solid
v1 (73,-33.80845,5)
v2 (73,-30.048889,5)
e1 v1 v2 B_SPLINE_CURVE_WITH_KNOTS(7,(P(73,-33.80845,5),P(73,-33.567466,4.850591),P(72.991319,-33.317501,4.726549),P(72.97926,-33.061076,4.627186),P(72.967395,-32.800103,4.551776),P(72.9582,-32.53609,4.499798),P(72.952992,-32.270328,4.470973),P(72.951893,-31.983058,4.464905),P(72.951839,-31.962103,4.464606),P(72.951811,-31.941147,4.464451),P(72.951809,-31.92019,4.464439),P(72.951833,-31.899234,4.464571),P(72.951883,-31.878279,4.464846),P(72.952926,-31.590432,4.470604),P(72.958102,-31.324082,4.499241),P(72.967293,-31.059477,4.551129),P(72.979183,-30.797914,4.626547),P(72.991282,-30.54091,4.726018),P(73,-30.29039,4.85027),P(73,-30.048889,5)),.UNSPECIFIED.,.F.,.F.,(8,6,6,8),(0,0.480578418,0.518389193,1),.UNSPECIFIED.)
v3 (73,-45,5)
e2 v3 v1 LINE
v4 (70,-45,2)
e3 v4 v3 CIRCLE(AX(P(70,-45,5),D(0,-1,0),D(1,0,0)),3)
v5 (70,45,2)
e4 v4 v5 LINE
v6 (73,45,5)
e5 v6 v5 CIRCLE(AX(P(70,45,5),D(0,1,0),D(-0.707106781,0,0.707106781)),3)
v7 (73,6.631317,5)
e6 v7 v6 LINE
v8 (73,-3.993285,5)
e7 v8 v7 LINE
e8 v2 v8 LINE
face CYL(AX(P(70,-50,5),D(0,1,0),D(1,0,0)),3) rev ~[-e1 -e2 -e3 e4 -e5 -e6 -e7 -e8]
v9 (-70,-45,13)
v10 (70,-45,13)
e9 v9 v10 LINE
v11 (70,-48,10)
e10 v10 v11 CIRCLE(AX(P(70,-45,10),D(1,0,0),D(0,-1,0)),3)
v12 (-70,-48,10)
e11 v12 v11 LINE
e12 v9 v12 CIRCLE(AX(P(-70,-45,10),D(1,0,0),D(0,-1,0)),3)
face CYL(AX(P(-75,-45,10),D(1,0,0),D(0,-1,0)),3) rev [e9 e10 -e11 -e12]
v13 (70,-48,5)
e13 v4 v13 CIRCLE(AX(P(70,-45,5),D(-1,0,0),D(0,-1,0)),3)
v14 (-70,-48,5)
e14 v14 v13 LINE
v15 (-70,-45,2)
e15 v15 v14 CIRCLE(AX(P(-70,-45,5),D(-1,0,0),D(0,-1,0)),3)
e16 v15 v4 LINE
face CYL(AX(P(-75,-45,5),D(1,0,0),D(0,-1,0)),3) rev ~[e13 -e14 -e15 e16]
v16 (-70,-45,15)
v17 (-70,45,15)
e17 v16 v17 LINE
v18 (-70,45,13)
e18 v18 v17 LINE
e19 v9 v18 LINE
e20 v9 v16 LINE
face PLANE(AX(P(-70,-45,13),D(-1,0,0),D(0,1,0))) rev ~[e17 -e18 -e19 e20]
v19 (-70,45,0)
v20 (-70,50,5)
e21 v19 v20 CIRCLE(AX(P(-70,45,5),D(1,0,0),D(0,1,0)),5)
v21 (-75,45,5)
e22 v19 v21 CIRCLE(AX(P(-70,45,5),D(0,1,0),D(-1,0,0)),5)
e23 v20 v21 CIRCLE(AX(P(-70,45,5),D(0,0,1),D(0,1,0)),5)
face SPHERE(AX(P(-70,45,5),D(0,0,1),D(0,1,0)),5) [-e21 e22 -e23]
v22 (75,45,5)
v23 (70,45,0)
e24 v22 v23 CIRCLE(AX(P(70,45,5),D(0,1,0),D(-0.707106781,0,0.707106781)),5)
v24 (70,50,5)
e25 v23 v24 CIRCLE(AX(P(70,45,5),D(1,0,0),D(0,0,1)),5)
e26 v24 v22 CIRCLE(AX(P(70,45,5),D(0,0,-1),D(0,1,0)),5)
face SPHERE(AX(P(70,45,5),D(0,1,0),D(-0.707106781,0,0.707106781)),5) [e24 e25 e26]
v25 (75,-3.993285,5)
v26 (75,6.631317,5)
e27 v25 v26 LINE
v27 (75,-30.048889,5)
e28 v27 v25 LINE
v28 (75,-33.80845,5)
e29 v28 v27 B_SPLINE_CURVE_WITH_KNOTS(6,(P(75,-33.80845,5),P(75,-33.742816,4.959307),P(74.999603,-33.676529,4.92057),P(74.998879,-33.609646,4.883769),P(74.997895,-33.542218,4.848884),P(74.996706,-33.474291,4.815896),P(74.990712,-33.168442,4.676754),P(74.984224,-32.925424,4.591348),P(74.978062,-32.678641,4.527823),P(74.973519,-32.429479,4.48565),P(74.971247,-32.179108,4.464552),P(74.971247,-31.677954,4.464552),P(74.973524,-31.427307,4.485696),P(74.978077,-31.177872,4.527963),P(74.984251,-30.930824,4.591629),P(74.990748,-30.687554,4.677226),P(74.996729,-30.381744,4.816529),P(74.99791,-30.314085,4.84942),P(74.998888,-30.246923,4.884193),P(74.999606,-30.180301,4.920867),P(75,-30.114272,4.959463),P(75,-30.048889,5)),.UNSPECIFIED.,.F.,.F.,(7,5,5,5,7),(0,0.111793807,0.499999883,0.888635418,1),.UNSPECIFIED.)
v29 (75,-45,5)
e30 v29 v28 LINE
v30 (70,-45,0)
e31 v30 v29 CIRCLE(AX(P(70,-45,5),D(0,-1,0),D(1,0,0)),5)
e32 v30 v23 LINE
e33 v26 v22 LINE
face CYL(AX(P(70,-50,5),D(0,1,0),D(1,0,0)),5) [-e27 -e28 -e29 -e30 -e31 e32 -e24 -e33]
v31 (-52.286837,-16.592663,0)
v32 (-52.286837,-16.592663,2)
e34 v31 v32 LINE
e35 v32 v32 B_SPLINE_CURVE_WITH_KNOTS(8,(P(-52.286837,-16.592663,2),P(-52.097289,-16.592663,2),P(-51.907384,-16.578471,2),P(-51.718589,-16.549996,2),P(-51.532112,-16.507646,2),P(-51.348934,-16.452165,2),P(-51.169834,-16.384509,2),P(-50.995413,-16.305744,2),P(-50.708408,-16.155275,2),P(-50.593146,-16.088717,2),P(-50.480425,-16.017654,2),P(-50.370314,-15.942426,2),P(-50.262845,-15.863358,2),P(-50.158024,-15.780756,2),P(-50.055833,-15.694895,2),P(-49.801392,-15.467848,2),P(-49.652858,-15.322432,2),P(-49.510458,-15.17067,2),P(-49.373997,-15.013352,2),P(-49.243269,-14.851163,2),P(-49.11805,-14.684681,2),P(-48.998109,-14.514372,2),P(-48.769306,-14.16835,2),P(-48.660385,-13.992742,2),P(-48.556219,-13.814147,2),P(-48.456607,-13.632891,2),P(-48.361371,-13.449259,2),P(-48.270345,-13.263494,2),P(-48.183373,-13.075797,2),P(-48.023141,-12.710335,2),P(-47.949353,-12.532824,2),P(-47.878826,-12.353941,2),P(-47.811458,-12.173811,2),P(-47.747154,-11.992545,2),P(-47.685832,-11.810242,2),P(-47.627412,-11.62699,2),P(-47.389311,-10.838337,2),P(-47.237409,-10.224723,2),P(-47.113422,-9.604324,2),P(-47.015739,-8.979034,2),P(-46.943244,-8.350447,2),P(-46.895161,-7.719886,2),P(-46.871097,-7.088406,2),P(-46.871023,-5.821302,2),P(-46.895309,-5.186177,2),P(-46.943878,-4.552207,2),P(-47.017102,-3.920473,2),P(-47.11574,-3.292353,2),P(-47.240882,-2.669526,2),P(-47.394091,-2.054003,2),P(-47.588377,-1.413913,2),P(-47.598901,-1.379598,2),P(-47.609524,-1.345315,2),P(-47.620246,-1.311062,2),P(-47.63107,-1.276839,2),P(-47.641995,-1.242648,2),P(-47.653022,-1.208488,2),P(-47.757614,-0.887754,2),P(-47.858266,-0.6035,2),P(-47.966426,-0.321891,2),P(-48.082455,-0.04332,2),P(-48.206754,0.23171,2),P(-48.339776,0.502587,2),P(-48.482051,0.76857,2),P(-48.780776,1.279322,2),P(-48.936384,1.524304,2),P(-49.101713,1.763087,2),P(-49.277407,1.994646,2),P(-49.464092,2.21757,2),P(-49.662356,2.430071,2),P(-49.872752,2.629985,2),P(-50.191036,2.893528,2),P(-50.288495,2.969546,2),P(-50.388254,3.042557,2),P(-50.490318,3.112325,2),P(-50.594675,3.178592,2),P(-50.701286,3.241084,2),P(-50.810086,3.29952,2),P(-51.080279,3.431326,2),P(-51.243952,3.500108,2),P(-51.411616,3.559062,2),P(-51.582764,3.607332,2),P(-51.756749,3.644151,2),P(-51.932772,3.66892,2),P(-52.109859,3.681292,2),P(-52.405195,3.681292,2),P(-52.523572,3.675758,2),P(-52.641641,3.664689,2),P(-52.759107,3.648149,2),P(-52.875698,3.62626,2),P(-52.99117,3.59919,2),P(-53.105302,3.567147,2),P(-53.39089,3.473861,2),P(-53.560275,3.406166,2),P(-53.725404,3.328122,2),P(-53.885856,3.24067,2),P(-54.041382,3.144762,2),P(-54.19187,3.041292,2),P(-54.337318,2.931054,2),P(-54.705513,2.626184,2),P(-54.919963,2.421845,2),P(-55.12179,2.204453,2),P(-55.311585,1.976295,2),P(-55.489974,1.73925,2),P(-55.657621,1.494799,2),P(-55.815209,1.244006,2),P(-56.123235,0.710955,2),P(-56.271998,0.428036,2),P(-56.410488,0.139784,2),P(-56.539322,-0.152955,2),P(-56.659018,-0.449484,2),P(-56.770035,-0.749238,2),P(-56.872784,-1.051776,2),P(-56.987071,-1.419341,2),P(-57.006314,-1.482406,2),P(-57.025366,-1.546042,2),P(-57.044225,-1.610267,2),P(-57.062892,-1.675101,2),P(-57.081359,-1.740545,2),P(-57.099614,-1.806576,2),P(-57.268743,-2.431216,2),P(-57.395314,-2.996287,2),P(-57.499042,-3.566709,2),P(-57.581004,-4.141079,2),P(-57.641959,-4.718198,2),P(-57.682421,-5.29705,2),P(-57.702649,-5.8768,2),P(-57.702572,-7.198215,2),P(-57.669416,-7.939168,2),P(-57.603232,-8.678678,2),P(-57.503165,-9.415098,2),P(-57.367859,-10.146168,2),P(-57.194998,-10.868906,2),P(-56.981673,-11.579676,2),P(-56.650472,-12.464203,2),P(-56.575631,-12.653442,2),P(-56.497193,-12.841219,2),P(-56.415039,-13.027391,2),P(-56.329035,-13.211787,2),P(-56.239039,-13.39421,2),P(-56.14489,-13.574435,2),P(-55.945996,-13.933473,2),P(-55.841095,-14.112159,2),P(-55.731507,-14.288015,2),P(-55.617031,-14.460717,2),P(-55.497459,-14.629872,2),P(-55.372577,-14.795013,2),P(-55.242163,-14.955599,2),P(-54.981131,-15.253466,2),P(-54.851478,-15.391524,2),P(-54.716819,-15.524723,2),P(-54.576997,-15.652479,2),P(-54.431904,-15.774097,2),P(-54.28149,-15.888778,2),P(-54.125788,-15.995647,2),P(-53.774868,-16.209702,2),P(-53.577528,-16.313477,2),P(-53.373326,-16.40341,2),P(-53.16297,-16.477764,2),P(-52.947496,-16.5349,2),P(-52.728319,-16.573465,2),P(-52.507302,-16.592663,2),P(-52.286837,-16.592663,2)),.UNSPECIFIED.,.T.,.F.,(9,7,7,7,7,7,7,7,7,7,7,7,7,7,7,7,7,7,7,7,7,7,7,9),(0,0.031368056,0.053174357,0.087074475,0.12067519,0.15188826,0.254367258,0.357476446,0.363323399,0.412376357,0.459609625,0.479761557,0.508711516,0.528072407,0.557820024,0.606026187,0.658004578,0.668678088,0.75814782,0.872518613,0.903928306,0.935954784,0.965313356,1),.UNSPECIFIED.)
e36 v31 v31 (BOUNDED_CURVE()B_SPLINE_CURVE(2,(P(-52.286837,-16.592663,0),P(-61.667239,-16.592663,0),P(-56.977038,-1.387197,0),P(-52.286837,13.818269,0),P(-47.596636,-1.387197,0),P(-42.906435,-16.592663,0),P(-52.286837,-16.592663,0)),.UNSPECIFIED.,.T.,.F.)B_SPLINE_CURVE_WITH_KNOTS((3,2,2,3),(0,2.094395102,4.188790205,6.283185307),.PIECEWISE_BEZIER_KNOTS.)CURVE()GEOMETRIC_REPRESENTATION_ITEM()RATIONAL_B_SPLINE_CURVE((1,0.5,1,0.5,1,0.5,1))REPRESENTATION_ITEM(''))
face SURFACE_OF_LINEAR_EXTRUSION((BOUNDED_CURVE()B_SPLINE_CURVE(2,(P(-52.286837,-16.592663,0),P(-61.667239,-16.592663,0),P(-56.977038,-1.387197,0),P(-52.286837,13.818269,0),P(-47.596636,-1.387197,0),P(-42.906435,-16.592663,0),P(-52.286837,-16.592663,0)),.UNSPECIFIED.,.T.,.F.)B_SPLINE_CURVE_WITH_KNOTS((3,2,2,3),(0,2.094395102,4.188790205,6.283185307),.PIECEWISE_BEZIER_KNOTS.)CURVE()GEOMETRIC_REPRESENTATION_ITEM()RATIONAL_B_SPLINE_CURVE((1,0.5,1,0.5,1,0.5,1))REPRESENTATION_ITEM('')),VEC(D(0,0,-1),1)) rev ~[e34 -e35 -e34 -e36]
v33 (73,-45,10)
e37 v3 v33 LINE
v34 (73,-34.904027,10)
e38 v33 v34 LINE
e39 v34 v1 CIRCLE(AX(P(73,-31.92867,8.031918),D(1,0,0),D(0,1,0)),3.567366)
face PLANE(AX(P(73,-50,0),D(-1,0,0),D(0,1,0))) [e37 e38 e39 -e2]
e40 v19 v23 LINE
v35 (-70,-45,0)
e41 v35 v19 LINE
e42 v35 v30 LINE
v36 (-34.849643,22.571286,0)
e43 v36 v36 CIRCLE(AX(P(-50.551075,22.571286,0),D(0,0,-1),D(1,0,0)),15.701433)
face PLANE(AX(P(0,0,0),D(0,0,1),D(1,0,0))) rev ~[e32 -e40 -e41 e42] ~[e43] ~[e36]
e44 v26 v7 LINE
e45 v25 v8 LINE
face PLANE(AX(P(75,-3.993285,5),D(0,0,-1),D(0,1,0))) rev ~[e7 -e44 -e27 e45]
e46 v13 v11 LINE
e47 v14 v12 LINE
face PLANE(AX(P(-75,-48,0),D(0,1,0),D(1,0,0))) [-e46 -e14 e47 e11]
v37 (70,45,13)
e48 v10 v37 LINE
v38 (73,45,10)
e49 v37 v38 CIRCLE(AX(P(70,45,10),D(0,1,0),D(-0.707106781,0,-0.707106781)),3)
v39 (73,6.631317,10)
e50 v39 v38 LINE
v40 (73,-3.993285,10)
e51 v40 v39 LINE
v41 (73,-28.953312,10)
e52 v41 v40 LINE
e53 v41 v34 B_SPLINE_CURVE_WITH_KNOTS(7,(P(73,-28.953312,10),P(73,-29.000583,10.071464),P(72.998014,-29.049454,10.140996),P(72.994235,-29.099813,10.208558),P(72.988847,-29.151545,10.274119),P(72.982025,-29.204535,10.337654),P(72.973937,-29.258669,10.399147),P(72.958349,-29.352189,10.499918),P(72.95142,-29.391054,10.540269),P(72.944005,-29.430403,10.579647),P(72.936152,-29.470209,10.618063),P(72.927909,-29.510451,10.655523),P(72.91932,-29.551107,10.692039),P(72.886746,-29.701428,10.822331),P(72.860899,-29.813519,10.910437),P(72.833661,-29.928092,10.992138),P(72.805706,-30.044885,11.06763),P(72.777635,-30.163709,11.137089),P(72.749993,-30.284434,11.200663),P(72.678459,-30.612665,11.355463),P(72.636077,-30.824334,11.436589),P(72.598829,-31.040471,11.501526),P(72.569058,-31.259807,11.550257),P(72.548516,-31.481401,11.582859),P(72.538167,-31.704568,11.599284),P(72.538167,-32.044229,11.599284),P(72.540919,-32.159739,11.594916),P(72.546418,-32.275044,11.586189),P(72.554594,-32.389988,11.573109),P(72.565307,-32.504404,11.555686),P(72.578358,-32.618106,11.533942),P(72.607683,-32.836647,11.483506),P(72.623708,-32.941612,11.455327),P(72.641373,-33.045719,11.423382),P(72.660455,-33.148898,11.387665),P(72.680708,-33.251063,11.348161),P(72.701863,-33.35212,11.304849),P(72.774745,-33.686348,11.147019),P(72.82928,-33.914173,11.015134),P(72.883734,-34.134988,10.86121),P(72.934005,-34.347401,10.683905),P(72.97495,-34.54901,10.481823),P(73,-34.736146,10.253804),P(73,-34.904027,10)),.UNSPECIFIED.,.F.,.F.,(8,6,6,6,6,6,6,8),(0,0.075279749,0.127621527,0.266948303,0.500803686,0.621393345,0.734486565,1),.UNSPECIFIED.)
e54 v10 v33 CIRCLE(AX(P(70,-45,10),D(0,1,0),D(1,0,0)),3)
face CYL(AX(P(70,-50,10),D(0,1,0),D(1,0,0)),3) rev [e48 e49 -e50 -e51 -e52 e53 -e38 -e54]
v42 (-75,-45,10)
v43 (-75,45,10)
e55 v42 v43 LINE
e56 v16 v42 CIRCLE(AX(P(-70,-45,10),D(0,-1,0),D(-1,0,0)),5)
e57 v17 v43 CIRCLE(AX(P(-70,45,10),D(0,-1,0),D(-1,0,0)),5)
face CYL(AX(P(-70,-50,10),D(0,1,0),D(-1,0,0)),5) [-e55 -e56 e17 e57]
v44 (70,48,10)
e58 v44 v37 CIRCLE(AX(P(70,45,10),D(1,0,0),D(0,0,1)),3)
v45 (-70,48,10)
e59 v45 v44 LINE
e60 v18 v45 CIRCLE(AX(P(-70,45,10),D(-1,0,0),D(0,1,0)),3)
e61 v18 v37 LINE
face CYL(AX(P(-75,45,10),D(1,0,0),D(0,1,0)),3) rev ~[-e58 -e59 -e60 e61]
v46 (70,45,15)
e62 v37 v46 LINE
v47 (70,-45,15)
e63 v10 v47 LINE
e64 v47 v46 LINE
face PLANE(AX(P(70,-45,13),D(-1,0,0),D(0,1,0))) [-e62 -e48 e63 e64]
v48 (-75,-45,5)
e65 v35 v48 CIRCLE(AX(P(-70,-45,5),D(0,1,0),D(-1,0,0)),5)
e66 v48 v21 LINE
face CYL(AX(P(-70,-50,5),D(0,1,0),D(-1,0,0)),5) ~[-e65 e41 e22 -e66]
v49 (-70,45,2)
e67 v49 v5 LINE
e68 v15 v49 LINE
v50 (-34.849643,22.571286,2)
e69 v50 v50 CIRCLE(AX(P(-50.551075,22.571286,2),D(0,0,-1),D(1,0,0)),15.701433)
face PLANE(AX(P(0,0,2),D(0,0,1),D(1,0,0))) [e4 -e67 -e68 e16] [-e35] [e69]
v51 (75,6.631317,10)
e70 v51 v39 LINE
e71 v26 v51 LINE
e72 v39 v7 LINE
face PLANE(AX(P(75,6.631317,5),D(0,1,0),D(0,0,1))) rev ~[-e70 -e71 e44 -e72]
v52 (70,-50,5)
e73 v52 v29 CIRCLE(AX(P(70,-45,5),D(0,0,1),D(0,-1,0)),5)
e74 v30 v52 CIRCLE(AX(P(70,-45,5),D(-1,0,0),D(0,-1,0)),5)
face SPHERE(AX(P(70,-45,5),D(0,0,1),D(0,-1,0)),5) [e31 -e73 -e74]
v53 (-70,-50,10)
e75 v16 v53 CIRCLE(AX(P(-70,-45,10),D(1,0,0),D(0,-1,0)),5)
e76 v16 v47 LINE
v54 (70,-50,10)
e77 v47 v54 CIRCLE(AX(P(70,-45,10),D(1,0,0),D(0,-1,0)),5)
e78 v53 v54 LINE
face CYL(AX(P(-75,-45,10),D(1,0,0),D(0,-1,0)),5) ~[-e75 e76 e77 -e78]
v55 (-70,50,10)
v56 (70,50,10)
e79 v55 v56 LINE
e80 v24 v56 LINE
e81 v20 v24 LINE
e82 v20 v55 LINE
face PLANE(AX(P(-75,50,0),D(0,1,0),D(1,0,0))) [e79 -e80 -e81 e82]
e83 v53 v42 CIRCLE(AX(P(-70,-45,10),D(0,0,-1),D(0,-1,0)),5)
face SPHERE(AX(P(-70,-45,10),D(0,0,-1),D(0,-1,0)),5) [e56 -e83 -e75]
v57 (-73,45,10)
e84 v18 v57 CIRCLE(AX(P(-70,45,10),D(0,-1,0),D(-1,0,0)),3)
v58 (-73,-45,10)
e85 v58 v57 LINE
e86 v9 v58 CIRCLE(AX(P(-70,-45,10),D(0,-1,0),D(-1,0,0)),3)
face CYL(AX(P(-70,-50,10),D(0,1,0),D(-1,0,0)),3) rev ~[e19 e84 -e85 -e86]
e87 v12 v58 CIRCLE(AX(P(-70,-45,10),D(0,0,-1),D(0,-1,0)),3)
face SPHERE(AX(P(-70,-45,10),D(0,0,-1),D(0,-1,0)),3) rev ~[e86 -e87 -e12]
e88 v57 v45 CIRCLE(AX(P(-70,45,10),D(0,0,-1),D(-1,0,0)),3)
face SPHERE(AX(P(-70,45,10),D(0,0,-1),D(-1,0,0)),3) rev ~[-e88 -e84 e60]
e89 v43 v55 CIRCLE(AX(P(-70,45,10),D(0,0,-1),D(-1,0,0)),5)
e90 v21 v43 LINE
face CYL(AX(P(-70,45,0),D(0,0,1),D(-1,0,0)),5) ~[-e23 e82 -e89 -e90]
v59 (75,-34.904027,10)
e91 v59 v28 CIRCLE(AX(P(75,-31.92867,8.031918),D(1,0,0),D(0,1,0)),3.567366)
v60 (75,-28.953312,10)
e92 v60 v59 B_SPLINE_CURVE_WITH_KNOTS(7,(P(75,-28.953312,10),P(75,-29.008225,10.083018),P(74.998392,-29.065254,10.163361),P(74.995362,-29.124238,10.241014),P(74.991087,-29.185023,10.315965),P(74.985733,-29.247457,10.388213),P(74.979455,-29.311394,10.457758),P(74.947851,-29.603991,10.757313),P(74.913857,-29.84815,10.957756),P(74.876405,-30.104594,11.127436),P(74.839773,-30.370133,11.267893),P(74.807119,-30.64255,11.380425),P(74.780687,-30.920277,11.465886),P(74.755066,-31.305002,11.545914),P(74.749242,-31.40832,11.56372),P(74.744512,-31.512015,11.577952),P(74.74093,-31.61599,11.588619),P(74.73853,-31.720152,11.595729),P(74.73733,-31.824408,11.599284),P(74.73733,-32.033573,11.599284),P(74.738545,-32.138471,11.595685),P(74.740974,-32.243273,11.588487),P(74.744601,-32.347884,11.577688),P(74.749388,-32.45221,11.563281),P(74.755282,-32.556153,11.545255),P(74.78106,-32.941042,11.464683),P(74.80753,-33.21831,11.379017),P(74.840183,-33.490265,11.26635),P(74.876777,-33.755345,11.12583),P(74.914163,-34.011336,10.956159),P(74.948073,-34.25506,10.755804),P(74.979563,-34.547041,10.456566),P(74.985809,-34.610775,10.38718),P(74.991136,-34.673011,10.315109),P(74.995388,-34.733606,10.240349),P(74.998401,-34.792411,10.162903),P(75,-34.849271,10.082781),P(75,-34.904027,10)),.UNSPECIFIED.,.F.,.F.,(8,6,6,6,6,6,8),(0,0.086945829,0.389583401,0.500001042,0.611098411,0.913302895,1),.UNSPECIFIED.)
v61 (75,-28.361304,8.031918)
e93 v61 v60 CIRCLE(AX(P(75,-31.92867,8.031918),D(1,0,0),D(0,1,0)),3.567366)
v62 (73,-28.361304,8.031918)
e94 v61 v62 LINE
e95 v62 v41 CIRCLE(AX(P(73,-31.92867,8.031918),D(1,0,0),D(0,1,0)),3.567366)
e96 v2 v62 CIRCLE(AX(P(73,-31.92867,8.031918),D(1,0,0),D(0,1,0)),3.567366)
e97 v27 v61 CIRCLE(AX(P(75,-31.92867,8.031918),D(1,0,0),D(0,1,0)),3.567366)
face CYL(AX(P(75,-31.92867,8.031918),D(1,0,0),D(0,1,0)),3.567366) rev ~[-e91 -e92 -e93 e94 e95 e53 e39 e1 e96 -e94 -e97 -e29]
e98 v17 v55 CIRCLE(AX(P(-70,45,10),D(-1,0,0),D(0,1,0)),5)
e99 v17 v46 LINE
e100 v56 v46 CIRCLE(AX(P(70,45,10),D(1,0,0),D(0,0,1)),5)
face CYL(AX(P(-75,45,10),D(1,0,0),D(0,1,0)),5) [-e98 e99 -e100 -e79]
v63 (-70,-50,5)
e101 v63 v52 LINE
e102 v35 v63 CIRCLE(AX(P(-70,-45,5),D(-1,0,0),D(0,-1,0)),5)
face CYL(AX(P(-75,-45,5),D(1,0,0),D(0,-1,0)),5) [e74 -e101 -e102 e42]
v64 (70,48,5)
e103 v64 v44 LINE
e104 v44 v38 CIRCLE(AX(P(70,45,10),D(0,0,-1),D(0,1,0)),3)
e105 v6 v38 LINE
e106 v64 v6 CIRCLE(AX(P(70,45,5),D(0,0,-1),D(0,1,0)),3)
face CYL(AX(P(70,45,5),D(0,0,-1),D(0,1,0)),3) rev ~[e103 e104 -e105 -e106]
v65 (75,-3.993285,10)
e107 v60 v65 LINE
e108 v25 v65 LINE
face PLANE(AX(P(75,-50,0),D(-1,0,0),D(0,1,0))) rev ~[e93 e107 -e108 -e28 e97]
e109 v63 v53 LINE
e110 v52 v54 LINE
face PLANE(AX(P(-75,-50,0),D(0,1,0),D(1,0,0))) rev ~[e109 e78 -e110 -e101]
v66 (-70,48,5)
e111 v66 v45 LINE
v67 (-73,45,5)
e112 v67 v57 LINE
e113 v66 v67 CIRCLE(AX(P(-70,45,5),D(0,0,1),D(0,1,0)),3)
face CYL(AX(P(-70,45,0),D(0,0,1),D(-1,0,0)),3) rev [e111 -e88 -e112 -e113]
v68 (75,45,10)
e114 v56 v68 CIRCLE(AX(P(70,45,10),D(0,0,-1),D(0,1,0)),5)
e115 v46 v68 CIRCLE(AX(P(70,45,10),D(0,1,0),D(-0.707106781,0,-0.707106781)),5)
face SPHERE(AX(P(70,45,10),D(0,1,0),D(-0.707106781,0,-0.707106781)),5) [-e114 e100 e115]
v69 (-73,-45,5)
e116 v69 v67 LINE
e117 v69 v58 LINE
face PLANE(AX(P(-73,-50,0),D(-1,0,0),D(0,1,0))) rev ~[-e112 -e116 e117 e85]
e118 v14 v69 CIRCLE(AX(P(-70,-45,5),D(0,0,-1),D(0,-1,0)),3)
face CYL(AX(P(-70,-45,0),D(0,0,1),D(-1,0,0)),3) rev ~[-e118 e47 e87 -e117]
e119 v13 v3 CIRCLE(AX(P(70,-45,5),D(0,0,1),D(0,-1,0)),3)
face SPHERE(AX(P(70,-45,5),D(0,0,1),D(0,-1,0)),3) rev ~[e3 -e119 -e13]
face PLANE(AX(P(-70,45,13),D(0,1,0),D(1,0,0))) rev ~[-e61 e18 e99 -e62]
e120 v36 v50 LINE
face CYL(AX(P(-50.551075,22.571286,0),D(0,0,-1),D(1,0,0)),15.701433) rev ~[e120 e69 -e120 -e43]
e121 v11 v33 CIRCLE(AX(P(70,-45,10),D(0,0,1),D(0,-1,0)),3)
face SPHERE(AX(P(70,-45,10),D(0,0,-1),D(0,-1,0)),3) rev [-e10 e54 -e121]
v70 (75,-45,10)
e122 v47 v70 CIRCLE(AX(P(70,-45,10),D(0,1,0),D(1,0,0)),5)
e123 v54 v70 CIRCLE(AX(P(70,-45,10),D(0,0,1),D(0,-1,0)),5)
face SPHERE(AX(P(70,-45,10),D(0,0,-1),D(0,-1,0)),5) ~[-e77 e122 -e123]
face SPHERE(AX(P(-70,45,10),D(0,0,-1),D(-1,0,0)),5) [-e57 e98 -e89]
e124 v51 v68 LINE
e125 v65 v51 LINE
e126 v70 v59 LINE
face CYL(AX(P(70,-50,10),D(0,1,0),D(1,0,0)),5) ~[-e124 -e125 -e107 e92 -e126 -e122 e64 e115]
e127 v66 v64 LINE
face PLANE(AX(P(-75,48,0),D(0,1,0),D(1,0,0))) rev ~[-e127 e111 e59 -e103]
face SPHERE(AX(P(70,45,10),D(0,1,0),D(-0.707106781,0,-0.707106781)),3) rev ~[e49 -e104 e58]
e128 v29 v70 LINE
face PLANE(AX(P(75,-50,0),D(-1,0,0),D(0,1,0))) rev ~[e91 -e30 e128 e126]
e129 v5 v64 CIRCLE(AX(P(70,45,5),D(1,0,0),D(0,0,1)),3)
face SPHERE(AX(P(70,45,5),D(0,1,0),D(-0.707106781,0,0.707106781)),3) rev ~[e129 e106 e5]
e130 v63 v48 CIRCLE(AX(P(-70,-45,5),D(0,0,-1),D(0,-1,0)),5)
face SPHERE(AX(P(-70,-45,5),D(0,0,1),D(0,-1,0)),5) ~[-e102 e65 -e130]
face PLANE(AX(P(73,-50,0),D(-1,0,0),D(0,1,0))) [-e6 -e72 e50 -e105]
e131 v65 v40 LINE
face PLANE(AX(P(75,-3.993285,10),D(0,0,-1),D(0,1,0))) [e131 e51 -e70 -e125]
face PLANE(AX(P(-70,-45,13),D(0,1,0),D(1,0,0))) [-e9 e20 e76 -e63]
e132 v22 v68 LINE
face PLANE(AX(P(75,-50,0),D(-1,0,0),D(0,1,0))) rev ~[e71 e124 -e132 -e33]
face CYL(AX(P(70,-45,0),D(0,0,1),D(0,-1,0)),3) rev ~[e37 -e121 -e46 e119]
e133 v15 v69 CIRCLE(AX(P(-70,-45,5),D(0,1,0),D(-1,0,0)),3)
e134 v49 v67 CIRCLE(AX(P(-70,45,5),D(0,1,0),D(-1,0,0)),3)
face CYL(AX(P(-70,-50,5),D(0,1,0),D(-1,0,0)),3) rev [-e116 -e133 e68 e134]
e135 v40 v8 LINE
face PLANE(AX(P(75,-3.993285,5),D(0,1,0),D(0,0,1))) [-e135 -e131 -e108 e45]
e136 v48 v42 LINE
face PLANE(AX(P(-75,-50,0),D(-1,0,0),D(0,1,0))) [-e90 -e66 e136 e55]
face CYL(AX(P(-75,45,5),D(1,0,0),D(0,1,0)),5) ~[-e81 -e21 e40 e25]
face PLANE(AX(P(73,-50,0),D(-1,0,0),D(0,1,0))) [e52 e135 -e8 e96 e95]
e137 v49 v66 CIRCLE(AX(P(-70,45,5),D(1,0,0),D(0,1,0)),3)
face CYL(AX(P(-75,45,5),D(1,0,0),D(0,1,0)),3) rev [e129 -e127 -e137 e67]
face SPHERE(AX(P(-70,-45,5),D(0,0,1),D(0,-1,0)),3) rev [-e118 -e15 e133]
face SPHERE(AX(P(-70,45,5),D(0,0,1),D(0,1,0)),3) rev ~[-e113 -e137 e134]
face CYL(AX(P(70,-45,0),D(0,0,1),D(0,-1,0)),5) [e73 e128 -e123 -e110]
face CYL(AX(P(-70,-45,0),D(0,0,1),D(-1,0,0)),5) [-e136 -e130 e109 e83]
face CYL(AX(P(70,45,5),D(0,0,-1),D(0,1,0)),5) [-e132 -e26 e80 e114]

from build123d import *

# Parameters (mm, degrees)
F0_W         = 150
F0_H         = 100
F1_DEPTH     = 15
F2_R         = 5
F3_T1_DEPTH  = 5
F3_S5_W      = 5
F3_S5_H      = 5
F3_T6_DEPTH  = 5
F3_S11_W     = 5
F3_S11_H     = 5
F3_T12_DEPTH = 5
F4_T         = -2
F6_R         = 15.7014328103
F7_DEPTH     = 25
F8_W         = 10.624602437
F8_H         = 5
F8_R         = 3.5673659444
F9_DEPTH     = 25


# Not quite as in the source:
# - a fillet or chamfer that OpenCascade refuses, or shapes differently, is made with other operations: its cross-section is extruded or revolved along the edge and cut away or added
# - a shell that OpenCascade refuses in one call is made with other operations: the cavity is built on its own and cut out


with BuildPart() as f1:
    # F0 (on Top) → F1 (new body)
    with BuildSketch(Plane.XY):
        Rectangle(F0_W, F0_H)
    extrude(amount=F1_DEPTH)

    # F2
    f2_edges = [f1.edges().sort_by_distance(p)[0] for p in [
        (-75, 50, 7.5),
        (-75, -50, 7.5),
        (75, -50, 7.5),
        (0, 50, 0),
        (0, -50, 0),
        (0, -50, 15),
        (-75, 0, 0),
        (-75, 0, 15),
        (75, 0, 0),
        (0, 50, 15),
        (75, 0, 15),
    ]]
    fillet(f2_edges, radius=F2_R)

    # F3: fillet of radius 5 on 1 edges, made by hand

    # F3_s2 → F3_t1 (cut)
    with BuildSketch(Plane.XY.offset(5)):
        with BuildLine():
            ThreePointArc((70, 50), (73.5355339059, 48.5355339059), (75, 45))
            Line((75, 45), (75, 50))
            Line((75, 50), (70, 50))
        make_face()
    extrude(amount=F3_T1_DEPTH, mode=Mode.SUBTRACT)


with BuildPart() as f3_tool4:
    # F3_s5 → F3_t6 (new body)
    with BuildSketch(Plane.XZ.offset(-45)):
        with Locations((72.5, 2.5)):
            Rectangle(F3_S5_W, F3_S5_H)
    extrude(amount=-F3_T6_DEPTH)

    # F3_s7 → F3_t8 (revolve, cut)
    with BuildSketch(Plane(origin=(70, 45, 5), x_dir=(-0.7071067812, 0, 0.7071067812), z_dir=(-0.7071067812, 0, -0.7071067812))):
        with BuildLine():
            ThreePointArc((0, -5), (5, 0), (0, 5))
            Line((0, 5), (0, -5))
        make_face()
    revolve(axis=Axis((70, 45, 5), (0, 1, 0)), mode=Mode.SUBTRACT)


with BuildPart() as f1_1:
    add(f1.part)

    # F3_t3: cut F3_tool4
    add(f3_tool4.part, mode=Mode.SUBTRACT)


with BuildPart() as f3_tool10:
    # F3_s11 → F3_t12 (new body)
    with BuildSketch(Plane.XZ.offset(-45)):
        with Locations((72.5, 12.5)):
            Rectangle(F3_S11_W, F3_S11_H)
    extrude(amount=-F3_T12_DEPTH)

    # F3_s13 → F3_t14 (revolve, cut)
    with BuildSketch(Plane(origin=(70, 45, 10), x_dir=(-0.7071067812, 0, -0.7071067812), z_dir=(0.7071067812, 0, -0.7071067812))):
        with BuildLine():
            ThreePointArc((0, -5), (5, 0), (0, 5))
            Line((0, 5), (0, -5))
        make_face()
    revolve(axis=Axis((70, 45, 10), (0, 1, 0)), mode=Mode.SUBTRACT)


with BuildPart() as f1_2:
    add(f1_1.part)

    # F3_t9: cut F3_tool10
    add(f3_tool10.part, mode=Mode.SUBTRACT)

    # F4: a shell. OpenCascade refuses it in one call, so the cavity is built on its own and cut out:
    # the body offset inwards by the wall thickness, plus a prism from it out through each open face.
    f4_core = offset(f1_2.part, amount=F4_T, mode=Mode.PRIVATE)
    f4_exits = [f4_core.faces().sort_by_distance(p)[0] for p in [
        (0, 0, 13),
    ]]
    add(f4_core, mode=Mode.SUBTRACT)
    extrude(f4_exits, amount=-F4_T, mode=Mode.SUBTRACT)

    # F6 (on face) → F7 (cut)
    with BuildSketch(Plane(origin=(0, 0, 0), x_dir=(1, 0, 0), z_dir=(0, 0, -1))):
        with Locations((-50.5510754883, -22.5712861866)):
            Circle(F6_R)
        with BuildLine():
            add(Edge.make_bspline(
                [(-52.28683725, 16.5926627815), (-61.667239248, 16.5926627815), (-56.977038249, 1.3871968258), (-52.28683725, -13.8182691298), (-47.596636251, 1.3871968258), (-42.906435252, 16.5926627815), (-52.28683725, 16.5926627815)],
                knots=[0, 0, 0, 2.0943951024, 2.0943951024, 4.1887902048, 4.1887902048, 6.2831853072, 6.2831853072, 6.2831853072], degree=2, weights=[1, 0.5, 1, 0.5, 1, 0.5, 1]))
        make_face()
    extrude(amount=-F7_DEPTH, mode=Mode.SUBTRACT)

    # F8 (on face) → F9 (cut)
    with BuildSketch(Plane.YZ.offset(75)):
        with Locations((1.3190158643, 7.5)):
            Rectangle(F8_W, F8_H)
        with Locations((-31.9286696613, 8.0319177359)):
            Circle(F8_R)
    extrude(amount=-F9_DEPTH, mode=Mode.SUBTRACT)


solid = f1_2.part
